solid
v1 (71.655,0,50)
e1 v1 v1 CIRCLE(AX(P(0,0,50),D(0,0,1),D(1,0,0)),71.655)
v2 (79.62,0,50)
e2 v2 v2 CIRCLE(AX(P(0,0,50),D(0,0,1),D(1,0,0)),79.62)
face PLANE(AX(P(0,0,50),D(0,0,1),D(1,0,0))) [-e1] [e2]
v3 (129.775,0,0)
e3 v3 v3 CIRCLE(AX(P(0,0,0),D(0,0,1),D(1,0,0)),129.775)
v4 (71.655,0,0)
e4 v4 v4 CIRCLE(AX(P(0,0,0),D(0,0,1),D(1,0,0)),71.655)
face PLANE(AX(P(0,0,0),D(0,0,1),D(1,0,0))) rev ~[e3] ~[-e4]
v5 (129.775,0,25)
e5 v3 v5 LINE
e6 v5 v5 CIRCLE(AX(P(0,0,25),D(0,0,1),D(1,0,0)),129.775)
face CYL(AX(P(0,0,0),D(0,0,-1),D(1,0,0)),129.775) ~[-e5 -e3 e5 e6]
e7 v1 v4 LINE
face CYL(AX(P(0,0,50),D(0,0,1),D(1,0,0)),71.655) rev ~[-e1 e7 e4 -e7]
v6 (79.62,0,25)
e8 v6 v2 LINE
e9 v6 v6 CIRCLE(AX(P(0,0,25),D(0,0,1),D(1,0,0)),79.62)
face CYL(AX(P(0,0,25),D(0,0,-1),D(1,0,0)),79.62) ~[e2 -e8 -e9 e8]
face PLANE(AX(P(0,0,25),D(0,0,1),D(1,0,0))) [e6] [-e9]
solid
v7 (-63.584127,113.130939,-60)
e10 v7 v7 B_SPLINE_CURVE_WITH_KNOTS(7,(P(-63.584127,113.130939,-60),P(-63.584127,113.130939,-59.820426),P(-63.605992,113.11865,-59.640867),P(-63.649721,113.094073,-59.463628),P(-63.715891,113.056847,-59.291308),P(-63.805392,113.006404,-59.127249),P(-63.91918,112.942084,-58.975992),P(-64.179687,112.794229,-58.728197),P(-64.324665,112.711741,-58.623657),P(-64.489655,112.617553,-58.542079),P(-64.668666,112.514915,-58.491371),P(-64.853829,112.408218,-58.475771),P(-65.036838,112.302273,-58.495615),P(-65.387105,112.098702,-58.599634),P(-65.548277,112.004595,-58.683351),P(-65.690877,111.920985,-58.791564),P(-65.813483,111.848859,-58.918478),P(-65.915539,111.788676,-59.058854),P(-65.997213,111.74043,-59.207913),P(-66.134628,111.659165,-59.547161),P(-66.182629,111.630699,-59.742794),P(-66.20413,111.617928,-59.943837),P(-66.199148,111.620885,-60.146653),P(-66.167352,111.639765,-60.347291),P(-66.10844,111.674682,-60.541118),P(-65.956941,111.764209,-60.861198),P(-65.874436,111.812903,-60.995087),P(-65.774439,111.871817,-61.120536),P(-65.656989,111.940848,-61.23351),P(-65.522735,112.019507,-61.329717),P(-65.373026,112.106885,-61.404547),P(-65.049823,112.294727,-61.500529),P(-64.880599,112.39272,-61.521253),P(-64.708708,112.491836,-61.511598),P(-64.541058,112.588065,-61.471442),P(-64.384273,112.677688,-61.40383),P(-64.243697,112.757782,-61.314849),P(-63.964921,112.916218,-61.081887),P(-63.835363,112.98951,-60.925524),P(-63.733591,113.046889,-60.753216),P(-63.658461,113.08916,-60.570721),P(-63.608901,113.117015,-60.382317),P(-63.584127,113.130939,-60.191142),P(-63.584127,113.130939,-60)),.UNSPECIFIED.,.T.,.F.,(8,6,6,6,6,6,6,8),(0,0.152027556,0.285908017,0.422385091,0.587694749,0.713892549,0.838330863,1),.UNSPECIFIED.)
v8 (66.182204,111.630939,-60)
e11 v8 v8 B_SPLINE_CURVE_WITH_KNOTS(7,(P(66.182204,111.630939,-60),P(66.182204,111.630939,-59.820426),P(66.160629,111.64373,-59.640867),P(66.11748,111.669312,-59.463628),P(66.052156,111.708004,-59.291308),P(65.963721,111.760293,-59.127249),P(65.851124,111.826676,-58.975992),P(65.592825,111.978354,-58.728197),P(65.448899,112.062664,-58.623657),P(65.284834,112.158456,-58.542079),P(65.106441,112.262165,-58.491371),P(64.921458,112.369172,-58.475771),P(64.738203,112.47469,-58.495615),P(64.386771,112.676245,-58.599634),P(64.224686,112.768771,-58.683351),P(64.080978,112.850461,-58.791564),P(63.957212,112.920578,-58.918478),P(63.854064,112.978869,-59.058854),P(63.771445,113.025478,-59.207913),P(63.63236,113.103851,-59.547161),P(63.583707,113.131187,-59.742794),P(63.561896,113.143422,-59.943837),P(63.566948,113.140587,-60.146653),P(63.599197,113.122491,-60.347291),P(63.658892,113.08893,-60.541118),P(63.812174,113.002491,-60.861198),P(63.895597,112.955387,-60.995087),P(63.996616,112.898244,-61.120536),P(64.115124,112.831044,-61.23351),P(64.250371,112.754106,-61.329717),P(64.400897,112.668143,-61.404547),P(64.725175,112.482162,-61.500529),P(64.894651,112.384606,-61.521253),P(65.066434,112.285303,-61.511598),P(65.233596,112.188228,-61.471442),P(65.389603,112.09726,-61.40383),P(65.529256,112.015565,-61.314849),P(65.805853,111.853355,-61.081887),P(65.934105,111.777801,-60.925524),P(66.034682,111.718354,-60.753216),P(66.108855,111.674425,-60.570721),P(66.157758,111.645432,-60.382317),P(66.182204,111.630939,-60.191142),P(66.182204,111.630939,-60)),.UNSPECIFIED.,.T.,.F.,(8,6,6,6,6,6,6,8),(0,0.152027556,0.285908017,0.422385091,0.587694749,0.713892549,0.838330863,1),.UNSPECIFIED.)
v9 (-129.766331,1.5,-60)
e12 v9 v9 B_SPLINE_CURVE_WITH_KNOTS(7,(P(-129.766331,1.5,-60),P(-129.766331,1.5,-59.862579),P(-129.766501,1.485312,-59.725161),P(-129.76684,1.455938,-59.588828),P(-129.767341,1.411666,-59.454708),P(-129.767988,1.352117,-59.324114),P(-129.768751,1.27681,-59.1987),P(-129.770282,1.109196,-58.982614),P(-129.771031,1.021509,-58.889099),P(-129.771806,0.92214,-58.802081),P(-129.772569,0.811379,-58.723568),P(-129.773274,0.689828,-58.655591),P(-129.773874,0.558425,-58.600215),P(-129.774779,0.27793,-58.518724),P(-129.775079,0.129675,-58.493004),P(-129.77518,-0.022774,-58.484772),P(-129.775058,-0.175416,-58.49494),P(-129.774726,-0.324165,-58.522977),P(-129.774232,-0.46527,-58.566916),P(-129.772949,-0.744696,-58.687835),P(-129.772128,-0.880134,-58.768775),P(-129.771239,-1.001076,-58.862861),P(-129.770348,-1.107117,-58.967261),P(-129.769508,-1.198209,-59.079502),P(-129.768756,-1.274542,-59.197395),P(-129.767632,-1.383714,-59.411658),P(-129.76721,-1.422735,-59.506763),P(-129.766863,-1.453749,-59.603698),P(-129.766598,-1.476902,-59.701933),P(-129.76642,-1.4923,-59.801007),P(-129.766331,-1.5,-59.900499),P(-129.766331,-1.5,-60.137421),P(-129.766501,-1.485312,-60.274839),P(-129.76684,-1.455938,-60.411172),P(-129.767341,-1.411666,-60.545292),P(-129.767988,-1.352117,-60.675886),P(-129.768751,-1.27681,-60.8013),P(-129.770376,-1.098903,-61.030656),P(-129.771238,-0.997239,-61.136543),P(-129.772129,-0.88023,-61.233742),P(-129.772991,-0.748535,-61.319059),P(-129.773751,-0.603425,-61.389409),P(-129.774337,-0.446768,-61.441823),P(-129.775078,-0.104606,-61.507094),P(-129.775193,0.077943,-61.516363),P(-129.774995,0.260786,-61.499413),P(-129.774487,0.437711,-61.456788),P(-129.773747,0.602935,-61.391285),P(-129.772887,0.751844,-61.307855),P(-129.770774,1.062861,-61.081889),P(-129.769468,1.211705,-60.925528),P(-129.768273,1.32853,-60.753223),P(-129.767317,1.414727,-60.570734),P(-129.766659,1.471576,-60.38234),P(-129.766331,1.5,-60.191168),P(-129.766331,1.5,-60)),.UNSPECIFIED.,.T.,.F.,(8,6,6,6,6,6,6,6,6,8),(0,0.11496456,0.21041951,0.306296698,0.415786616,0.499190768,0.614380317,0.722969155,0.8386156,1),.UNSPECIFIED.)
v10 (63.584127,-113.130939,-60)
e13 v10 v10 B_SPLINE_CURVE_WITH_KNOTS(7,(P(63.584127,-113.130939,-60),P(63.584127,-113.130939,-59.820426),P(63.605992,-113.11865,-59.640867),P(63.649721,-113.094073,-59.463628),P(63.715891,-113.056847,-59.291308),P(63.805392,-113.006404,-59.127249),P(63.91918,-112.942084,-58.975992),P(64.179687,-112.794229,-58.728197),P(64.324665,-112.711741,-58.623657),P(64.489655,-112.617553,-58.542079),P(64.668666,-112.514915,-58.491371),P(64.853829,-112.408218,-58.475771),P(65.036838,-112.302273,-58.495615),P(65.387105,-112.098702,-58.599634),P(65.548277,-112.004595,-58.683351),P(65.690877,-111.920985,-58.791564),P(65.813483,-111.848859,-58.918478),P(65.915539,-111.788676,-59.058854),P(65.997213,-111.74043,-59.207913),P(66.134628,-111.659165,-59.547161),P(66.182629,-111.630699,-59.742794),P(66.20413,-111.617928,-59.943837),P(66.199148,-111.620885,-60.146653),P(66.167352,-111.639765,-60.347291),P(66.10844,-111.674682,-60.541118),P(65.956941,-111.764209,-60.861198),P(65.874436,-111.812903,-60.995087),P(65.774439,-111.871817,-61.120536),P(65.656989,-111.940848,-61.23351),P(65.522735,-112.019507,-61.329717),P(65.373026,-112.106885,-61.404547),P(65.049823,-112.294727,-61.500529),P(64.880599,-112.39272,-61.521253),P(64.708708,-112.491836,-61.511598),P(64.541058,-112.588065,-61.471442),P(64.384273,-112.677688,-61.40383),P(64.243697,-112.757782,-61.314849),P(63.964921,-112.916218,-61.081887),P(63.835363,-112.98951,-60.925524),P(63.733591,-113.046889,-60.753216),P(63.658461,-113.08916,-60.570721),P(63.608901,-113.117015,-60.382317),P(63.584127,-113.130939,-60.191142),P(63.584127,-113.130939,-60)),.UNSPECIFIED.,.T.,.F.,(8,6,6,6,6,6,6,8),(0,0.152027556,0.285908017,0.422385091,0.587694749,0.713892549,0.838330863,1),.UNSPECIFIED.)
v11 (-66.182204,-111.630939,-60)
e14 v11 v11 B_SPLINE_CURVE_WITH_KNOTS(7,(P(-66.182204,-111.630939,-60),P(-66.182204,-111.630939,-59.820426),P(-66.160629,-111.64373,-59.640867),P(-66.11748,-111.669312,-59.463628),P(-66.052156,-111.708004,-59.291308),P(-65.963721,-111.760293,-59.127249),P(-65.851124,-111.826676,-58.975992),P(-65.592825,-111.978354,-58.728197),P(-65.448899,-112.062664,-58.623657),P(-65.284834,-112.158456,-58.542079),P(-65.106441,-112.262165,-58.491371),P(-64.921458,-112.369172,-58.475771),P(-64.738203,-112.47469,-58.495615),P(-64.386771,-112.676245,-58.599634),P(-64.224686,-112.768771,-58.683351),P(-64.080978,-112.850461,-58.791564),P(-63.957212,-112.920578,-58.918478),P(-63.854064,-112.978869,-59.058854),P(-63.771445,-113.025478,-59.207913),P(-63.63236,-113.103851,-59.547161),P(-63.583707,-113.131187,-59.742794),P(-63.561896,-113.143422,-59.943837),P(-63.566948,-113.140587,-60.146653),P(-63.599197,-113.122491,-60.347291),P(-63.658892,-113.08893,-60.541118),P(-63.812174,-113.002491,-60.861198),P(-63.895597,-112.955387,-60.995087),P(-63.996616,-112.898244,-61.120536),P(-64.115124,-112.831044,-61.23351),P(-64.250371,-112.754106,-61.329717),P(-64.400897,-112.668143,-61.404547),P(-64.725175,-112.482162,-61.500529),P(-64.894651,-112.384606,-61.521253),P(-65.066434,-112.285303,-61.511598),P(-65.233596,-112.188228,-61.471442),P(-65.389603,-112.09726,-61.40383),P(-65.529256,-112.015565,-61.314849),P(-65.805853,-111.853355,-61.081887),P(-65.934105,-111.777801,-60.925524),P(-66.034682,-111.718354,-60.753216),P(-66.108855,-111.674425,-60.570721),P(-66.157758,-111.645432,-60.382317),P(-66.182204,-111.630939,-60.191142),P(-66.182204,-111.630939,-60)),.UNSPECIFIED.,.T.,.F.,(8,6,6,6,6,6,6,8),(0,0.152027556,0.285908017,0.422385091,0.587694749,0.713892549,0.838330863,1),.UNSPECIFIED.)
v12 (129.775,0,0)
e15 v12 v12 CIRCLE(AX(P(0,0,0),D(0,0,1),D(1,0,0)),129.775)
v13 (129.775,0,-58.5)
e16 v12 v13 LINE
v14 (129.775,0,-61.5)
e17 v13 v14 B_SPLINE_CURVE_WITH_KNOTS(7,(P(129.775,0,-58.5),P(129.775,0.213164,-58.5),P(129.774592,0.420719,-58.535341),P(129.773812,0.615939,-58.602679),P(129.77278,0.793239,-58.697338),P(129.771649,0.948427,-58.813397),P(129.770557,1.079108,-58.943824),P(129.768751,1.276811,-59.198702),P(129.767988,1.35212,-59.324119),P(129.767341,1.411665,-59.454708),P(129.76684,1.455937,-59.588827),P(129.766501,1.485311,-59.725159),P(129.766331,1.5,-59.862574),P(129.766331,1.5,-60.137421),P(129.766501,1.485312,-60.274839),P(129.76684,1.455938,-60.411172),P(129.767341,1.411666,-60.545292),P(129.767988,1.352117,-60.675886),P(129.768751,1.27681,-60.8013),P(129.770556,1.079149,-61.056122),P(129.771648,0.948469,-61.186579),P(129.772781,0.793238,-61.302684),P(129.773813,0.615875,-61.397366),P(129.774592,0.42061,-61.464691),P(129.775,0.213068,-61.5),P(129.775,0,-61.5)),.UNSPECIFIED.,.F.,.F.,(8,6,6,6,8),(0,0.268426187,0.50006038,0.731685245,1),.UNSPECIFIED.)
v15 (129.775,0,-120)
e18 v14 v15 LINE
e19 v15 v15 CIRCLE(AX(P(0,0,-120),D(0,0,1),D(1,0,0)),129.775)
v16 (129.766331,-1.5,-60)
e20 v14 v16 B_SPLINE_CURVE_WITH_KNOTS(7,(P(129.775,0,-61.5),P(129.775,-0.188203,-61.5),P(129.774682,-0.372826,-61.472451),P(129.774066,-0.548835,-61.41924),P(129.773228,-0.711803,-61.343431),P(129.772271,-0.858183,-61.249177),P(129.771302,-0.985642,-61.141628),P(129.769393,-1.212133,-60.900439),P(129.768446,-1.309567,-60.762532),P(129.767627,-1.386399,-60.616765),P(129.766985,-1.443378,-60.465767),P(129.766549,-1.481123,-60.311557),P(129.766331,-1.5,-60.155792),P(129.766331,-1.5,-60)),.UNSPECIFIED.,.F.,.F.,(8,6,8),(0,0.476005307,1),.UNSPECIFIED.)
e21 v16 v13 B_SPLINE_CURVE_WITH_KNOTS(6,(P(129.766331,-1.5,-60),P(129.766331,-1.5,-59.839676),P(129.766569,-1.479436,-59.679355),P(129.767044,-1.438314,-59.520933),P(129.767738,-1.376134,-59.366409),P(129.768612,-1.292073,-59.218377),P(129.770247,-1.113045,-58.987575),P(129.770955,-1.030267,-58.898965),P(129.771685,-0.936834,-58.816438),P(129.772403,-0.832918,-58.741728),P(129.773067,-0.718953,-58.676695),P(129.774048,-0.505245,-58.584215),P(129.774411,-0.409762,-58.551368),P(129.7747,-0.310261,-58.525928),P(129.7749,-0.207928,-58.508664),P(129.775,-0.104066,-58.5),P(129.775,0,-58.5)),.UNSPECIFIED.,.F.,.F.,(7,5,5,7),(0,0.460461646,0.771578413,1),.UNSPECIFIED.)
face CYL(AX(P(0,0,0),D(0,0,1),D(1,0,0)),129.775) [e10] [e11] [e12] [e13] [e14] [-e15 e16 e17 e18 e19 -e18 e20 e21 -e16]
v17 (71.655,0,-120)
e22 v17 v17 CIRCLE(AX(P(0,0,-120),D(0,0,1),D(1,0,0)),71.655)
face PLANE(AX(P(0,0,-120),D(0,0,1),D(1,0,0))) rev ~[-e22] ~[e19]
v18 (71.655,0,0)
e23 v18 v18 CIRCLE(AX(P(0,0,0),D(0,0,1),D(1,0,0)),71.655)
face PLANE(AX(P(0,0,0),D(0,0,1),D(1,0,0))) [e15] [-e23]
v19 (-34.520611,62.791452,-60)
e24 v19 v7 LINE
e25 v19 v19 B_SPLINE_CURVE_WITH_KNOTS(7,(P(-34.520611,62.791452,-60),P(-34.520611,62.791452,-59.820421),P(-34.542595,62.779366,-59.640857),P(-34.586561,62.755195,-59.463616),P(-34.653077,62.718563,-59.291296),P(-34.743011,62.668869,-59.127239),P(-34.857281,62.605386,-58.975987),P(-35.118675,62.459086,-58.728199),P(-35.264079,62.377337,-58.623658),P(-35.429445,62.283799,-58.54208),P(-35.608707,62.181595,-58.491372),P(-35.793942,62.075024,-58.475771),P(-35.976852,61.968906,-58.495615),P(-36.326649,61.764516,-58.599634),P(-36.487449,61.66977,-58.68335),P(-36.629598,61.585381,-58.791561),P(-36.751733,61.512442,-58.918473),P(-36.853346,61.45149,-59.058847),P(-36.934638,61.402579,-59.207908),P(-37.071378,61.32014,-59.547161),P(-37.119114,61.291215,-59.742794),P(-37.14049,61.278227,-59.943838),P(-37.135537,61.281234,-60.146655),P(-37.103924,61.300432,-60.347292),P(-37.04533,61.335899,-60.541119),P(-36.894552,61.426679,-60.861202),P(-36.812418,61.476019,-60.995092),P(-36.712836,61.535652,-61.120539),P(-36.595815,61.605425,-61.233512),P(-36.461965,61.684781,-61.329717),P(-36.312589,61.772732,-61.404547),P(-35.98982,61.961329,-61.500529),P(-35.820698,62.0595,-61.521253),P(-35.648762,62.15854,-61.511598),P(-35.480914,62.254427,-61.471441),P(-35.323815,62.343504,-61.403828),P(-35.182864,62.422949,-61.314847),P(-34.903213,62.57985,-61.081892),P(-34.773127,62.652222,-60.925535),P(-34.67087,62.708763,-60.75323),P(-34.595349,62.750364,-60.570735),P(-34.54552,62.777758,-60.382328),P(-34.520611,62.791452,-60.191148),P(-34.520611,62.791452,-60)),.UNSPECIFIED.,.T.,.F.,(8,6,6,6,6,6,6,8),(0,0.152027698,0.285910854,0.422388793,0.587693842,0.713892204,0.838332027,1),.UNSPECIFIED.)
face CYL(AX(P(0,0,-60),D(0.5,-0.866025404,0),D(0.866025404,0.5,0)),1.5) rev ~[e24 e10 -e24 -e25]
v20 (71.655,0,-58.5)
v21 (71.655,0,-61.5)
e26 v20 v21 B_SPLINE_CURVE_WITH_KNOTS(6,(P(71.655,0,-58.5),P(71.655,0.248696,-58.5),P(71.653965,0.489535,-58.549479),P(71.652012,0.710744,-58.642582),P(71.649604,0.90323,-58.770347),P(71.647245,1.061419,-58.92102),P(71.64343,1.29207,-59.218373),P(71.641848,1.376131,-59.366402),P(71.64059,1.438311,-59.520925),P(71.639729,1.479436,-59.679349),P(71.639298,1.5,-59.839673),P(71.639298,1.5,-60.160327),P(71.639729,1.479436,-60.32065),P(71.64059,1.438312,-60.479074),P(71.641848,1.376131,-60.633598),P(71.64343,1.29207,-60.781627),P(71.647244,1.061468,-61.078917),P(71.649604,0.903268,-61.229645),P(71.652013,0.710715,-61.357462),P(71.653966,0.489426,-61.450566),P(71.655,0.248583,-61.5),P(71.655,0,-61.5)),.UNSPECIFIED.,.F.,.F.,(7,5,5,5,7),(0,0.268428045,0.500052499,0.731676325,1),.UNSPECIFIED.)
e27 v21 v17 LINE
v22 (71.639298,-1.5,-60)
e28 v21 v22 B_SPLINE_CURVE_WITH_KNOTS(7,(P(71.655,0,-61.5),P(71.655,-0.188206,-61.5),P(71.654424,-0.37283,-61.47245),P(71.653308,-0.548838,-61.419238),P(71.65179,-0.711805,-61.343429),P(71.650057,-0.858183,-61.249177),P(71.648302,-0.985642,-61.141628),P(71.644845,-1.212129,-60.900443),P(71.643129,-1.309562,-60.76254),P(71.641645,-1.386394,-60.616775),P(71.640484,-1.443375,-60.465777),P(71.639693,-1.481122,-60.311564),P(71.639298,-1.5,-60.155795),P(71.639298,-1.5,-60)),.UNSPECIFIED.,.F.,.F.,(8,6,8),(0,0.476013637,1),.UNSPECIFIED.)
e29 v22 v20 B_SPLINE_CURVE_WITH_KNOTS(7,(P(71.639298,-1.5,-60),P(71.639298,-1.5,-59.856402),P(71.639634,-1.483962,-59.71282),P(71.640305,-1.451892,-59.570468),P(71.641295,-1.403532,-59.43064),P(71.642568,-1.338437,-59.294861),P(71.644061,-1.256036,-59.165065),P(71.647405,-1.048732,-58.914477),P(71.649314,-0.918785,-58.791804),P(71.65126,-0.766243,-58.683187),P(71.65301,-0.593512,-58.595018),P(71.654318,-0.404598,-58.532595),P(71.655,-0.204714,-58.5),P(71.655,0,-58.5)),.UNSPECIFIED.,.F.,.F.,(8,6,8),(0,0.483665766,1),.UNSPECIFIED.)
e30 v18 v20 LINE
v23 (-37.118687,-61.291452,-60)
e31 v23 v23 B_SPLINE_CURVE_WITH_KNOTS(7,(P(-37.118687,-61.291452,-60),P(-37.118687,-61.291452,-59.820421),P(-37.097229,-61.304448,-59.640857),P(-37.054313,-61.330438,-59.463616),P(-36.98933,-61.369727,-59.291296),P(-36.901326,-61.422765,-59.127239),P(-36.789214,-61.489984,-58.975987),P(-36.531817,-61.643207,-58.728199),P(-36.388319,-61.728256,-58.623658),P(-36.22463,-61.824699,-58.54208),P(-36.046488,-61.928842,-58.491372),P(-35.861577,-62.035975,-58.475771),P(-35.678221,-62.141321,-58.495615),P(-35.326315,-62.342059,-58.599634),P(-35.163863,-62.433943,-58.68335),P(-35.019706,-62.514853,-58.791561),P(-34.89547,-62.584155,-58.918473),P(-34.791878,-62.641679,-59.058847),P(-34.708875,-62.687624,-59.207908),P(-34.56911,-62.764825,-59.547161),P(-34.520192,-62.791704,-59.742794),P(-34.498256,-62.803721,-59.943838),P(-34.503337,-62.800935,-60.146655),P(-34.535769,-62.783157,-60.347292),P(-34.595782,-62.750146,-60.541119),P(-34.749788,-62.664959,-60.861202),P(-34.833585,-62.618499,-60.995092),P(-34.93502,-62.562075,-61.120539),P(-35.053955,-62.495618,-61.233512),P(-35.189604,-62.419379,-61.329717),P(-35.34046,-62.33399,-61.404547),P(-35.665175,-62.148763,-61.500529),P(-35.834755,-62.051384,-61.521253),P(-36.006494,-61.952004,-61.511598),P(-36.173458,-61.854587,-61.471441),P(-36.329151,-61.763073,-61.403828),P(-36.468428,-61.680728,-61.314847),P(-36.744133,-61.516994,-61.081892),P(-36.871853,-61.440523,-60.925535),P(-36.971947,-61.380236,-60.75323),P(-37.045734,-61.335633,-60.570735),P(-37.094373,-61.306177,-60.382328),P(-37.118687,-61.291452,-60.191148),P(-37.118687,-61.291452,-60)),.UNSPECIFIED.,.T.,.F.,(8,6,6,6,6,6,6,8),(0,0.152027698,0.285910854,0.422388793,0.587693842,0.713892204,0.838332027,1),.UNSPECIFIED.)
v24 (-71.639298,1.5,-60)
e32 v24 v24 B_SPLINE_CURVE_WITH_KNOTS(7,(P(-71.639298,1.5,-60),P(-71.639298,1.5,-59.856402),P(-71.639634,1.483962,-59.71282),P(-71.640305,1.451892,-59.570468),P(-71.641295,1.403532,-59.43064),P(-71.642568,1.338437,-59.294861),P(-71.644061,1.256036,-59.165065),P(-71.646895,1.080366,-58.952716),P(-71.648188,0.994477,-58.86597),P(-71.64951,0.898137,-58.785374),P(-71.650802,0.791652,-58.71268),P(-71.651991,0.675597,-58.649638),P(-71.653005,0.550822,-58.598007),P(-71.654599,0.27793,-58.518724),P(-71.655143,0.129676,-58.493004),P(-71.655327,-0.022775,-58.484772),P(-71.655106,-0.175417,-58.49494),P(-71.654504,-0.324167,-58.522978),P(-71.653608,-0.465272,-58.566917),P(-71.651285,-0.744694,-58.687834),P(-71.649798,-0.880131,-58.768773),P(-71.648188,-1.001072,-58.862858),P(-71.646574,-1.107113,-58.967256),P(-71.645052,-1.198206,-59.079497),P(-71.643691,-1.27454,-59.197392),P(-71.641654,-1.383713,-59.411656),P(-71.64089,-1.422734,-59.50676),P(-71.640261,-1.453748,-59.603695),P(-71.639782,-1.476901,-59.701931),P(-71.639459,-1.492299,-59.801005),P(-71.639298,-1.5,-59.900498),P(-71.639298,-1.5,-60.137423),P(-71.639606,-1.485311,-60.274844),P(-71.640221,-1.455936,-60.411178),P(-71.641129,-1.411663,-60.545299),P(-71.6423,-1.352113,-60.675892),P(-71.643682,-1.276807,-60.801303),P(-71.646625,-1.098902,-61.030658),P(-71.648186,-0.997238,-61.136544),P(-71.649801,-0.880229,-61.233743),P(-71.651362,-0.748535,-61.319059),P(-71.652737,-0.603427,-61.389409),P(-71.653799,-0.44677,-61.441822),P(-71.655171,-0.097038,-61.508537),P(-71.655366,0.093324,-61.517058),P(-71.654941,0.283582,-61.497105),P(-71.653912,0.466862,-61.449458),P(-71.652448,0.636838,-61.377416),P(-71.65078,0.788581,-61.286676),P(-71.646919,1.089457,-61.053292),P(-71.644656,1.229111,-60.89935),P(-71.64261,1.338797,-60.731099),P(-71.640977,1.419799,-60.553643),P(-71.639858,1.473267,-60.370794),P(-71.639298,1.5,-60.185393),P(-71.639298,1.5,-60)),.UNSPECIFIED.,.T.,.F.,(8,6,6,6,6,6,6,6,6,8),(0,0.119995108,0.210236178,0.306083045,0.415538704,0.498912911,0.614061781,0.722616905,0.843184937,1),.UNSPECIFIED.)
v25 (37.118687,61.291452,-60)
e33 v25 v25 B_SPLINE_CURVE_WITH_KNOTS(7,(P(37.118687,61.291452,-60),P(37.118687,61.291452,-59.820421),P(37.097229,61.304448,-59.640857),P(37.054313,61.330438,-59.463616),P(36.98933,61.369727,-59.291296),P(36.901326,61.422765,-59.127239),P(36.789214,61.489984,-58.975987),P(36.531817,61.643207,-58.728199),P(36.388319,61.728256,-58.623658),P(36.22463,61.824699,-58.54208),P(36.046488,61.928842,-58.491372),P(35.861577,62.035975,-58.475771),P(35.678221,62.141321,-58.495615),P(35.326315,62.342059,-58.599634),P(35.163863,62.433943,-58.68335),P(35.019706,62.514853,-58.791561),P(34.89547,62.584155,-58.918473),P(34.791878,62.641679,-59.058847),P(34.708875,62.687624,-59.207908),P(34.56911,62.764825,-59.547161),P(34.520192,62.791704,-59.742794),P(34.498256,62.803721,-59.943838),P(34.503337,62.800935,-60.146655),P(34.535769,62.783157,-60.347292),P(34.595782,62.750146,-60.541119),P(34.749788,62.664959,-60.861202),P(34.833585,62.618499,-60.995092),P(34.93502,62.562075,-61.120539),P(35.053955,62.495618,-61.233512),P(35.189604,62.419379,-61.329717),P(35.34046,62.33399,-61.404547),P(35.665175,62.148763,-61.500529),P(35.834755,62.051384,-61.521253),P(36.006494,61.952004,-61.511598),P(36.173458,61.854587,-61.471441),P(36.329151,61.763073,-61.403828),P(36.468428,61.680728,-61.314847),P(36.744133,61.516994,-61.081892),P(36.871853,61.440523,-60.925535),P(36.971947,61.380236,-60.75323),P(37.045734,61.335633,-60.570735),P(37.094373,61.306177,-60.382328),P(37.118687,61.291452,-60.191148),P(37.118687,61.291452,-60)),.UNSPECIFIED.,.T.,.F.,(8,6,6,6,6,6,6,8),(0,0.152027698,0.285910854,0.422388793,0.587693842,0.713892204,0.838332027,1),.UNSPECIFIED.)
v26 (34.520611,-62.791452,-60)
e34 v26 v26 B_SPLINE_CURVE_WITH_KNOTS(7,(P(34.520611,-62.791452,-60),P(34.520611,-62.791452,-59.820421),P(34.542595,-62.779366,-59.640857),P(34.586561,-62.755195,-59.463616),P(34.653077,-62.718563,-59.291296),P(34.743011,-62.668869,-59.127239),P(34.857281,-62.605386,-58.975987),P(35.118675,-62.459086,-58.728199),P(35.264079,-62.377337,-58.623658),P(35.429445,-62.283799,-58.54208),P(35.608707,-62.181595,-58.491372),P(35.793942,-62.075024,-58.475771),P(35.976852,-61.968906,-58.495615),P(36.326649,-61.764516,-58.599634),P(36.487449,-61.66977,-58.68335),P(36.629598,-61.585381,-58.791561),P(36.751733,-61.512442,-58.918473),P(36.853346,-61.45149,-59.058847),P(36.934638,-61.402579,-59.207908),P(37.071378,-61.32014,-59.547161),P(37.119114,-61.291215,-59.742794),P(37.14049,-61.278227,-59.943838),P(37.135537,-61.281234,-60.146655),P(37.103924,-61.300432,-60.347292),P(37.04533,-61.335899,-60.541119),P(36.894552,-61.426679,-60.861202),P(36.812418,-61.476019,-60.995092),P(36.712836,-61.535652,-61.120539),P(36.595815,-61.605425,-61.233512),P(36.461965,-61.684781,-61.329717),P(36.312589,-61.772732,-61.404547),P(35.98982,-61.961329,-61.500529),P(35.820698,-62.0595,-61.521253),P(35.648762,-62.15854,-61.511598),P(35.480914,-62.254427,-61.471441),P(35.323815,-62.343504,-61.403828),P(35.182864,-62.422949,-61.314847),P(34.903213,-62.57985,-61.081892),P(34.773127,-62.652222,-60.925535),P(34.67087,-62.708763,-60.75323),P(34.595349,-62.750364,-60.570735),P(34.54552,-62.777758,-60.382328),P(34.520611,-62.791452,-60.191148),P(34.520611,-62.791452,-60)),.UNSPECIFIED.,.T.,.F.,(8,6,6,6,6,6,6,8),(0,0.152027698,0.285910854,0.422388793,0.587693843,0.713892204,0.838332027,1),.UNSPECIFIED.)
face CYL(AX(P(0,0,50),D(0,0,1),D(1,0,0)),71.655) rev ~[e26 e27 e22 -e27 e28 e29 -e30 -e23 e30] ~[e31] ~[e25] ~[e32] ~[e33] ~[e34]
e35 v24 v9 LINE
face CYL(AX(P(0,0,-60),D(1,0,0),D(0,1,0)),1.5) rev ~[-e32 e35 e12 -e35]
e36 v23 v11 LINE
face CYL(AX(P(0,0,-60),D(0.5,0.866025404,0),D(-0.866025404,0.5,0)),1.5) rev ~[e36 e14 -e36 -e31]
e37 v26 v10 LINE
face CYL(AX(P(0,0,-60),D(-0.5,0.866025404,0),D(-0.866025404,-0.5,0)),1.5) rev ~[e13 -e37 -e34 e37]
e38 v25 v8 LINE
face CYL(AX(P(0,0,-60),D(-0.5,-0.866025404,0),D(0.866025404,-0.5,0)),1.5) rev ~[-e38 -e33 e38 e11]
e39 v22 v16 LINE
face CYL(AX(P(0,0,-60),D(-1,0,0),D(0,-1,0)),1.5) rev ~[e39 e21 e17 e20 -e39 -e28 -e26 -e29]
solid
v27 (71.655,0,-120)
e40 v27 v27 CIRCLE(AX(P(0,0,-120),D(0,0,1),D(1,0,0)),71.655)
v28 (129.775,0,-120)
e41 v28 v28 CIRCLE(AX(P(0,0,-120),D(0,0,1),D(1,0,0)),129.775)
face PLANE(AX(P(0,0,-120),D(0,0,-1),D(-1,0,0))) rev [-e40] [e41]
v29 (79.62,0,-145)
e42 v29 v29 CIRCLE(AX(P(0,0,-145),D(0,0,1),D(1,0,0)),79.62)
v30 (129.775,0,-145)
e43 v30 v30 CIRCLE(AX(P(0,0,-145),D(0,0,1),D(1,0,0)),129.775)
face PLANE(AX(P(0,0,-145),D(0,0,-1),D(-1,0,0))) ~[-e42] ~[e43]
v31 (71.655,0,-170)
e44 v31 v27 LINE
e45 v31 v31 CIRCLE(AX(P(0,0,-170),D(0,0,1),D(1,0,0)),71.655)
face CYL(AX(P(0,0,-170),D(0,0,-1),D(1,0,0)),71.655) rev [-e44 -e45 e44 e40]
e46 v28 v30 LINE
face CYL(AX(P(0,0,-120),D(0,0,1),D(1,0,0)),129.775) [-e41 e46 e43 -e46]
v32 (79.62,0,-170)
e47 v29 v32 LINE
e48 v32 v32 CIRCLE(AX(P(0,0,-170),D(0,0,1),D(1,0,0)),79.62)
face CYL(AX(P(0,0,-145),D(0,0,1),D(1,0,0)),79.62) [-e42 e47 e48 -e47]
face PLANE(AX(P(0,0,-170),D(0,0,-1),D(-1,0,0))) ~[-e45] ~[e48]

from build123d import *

# Parameters (mm, degrees)
F0_R             = 129.775
F1_DEPTH         = 25
F2_R             = 79.62
F3_DEPTH         = 25
F4_R             = 71.655
F5_DEPTH         = 50
F6_R             = 129.775
F7_DEPTH         = 120
F9_DEPTH         = 170.001
F8_R             = 1.5
F10_DEPTH        = 129.776
F10_COPIES_COUNT = 6


# Not quite as in the source:
# - a pattern or mirror of a feature is missing from the dataset's text; its kind, count and spacing are read off the source's solid


with BuildPart() as f1:
    # F0 (on Top) → F1 (new body)
    with BuildSketch(Plane.XY):
        Circle(F0_R)
    extrude(amount=F1_DEPTH)

    # F2 (on face) → F3 (join)
    with BuildSketch(Plane.XY.offset(25)):
        Circle(F2_R)
    extrude(amount=F3_DEPTH)

    # F4 (on face) → F5 (cut, through all)
    with BuildSketch(Plane.XY.offset(50)):
        Circle(F4_R)
    extrude(amount=-F5_DEPTH, mode=Mode.SUBTRACT)


with BuildPart() as f7:
    # F6 (on Top) → F7 (new body)
    with BuildSketch(Plane.XY):
        Circle(F6_R)
    extrude(amount=-F7_DEPTH)

    # F4 (on face) → F9 (cut, through all)
    with BuildSketch(Plane.XY.offset(50)):
        Circle(F4_R)
    extrude(amount=-F9_DEPTH, mode=Mode.SUBTRACT)

    # F8 (on Right) → F10 (cut, through all)
    with BuildSketch(Plane.YZ):
        with Locations((0, -60)):
            Circle(F8_R)
    f10 = extrude(amount=-F10_DEPTH, mode=Mode.SUBTRACT)

    # F10_copies: F10 ×6 about axis
    f10_copies_axis = Axis((0, 0, 0), (0, 0, 1))
    for i in range(1, F10_COPIES_COUNT):
        add(f10.rotate(f10_copies_axis, i * 360 / F10_COPIES_COUNT), mode=Mode.SUBTRACT)


with BuildPart() as f12_1:
    # F12: instance of F1
    add(f1.part.mirror(Plane.XY.offset(-60)))


solid = Compound([f1.part, f7.part, f12_1.part])
